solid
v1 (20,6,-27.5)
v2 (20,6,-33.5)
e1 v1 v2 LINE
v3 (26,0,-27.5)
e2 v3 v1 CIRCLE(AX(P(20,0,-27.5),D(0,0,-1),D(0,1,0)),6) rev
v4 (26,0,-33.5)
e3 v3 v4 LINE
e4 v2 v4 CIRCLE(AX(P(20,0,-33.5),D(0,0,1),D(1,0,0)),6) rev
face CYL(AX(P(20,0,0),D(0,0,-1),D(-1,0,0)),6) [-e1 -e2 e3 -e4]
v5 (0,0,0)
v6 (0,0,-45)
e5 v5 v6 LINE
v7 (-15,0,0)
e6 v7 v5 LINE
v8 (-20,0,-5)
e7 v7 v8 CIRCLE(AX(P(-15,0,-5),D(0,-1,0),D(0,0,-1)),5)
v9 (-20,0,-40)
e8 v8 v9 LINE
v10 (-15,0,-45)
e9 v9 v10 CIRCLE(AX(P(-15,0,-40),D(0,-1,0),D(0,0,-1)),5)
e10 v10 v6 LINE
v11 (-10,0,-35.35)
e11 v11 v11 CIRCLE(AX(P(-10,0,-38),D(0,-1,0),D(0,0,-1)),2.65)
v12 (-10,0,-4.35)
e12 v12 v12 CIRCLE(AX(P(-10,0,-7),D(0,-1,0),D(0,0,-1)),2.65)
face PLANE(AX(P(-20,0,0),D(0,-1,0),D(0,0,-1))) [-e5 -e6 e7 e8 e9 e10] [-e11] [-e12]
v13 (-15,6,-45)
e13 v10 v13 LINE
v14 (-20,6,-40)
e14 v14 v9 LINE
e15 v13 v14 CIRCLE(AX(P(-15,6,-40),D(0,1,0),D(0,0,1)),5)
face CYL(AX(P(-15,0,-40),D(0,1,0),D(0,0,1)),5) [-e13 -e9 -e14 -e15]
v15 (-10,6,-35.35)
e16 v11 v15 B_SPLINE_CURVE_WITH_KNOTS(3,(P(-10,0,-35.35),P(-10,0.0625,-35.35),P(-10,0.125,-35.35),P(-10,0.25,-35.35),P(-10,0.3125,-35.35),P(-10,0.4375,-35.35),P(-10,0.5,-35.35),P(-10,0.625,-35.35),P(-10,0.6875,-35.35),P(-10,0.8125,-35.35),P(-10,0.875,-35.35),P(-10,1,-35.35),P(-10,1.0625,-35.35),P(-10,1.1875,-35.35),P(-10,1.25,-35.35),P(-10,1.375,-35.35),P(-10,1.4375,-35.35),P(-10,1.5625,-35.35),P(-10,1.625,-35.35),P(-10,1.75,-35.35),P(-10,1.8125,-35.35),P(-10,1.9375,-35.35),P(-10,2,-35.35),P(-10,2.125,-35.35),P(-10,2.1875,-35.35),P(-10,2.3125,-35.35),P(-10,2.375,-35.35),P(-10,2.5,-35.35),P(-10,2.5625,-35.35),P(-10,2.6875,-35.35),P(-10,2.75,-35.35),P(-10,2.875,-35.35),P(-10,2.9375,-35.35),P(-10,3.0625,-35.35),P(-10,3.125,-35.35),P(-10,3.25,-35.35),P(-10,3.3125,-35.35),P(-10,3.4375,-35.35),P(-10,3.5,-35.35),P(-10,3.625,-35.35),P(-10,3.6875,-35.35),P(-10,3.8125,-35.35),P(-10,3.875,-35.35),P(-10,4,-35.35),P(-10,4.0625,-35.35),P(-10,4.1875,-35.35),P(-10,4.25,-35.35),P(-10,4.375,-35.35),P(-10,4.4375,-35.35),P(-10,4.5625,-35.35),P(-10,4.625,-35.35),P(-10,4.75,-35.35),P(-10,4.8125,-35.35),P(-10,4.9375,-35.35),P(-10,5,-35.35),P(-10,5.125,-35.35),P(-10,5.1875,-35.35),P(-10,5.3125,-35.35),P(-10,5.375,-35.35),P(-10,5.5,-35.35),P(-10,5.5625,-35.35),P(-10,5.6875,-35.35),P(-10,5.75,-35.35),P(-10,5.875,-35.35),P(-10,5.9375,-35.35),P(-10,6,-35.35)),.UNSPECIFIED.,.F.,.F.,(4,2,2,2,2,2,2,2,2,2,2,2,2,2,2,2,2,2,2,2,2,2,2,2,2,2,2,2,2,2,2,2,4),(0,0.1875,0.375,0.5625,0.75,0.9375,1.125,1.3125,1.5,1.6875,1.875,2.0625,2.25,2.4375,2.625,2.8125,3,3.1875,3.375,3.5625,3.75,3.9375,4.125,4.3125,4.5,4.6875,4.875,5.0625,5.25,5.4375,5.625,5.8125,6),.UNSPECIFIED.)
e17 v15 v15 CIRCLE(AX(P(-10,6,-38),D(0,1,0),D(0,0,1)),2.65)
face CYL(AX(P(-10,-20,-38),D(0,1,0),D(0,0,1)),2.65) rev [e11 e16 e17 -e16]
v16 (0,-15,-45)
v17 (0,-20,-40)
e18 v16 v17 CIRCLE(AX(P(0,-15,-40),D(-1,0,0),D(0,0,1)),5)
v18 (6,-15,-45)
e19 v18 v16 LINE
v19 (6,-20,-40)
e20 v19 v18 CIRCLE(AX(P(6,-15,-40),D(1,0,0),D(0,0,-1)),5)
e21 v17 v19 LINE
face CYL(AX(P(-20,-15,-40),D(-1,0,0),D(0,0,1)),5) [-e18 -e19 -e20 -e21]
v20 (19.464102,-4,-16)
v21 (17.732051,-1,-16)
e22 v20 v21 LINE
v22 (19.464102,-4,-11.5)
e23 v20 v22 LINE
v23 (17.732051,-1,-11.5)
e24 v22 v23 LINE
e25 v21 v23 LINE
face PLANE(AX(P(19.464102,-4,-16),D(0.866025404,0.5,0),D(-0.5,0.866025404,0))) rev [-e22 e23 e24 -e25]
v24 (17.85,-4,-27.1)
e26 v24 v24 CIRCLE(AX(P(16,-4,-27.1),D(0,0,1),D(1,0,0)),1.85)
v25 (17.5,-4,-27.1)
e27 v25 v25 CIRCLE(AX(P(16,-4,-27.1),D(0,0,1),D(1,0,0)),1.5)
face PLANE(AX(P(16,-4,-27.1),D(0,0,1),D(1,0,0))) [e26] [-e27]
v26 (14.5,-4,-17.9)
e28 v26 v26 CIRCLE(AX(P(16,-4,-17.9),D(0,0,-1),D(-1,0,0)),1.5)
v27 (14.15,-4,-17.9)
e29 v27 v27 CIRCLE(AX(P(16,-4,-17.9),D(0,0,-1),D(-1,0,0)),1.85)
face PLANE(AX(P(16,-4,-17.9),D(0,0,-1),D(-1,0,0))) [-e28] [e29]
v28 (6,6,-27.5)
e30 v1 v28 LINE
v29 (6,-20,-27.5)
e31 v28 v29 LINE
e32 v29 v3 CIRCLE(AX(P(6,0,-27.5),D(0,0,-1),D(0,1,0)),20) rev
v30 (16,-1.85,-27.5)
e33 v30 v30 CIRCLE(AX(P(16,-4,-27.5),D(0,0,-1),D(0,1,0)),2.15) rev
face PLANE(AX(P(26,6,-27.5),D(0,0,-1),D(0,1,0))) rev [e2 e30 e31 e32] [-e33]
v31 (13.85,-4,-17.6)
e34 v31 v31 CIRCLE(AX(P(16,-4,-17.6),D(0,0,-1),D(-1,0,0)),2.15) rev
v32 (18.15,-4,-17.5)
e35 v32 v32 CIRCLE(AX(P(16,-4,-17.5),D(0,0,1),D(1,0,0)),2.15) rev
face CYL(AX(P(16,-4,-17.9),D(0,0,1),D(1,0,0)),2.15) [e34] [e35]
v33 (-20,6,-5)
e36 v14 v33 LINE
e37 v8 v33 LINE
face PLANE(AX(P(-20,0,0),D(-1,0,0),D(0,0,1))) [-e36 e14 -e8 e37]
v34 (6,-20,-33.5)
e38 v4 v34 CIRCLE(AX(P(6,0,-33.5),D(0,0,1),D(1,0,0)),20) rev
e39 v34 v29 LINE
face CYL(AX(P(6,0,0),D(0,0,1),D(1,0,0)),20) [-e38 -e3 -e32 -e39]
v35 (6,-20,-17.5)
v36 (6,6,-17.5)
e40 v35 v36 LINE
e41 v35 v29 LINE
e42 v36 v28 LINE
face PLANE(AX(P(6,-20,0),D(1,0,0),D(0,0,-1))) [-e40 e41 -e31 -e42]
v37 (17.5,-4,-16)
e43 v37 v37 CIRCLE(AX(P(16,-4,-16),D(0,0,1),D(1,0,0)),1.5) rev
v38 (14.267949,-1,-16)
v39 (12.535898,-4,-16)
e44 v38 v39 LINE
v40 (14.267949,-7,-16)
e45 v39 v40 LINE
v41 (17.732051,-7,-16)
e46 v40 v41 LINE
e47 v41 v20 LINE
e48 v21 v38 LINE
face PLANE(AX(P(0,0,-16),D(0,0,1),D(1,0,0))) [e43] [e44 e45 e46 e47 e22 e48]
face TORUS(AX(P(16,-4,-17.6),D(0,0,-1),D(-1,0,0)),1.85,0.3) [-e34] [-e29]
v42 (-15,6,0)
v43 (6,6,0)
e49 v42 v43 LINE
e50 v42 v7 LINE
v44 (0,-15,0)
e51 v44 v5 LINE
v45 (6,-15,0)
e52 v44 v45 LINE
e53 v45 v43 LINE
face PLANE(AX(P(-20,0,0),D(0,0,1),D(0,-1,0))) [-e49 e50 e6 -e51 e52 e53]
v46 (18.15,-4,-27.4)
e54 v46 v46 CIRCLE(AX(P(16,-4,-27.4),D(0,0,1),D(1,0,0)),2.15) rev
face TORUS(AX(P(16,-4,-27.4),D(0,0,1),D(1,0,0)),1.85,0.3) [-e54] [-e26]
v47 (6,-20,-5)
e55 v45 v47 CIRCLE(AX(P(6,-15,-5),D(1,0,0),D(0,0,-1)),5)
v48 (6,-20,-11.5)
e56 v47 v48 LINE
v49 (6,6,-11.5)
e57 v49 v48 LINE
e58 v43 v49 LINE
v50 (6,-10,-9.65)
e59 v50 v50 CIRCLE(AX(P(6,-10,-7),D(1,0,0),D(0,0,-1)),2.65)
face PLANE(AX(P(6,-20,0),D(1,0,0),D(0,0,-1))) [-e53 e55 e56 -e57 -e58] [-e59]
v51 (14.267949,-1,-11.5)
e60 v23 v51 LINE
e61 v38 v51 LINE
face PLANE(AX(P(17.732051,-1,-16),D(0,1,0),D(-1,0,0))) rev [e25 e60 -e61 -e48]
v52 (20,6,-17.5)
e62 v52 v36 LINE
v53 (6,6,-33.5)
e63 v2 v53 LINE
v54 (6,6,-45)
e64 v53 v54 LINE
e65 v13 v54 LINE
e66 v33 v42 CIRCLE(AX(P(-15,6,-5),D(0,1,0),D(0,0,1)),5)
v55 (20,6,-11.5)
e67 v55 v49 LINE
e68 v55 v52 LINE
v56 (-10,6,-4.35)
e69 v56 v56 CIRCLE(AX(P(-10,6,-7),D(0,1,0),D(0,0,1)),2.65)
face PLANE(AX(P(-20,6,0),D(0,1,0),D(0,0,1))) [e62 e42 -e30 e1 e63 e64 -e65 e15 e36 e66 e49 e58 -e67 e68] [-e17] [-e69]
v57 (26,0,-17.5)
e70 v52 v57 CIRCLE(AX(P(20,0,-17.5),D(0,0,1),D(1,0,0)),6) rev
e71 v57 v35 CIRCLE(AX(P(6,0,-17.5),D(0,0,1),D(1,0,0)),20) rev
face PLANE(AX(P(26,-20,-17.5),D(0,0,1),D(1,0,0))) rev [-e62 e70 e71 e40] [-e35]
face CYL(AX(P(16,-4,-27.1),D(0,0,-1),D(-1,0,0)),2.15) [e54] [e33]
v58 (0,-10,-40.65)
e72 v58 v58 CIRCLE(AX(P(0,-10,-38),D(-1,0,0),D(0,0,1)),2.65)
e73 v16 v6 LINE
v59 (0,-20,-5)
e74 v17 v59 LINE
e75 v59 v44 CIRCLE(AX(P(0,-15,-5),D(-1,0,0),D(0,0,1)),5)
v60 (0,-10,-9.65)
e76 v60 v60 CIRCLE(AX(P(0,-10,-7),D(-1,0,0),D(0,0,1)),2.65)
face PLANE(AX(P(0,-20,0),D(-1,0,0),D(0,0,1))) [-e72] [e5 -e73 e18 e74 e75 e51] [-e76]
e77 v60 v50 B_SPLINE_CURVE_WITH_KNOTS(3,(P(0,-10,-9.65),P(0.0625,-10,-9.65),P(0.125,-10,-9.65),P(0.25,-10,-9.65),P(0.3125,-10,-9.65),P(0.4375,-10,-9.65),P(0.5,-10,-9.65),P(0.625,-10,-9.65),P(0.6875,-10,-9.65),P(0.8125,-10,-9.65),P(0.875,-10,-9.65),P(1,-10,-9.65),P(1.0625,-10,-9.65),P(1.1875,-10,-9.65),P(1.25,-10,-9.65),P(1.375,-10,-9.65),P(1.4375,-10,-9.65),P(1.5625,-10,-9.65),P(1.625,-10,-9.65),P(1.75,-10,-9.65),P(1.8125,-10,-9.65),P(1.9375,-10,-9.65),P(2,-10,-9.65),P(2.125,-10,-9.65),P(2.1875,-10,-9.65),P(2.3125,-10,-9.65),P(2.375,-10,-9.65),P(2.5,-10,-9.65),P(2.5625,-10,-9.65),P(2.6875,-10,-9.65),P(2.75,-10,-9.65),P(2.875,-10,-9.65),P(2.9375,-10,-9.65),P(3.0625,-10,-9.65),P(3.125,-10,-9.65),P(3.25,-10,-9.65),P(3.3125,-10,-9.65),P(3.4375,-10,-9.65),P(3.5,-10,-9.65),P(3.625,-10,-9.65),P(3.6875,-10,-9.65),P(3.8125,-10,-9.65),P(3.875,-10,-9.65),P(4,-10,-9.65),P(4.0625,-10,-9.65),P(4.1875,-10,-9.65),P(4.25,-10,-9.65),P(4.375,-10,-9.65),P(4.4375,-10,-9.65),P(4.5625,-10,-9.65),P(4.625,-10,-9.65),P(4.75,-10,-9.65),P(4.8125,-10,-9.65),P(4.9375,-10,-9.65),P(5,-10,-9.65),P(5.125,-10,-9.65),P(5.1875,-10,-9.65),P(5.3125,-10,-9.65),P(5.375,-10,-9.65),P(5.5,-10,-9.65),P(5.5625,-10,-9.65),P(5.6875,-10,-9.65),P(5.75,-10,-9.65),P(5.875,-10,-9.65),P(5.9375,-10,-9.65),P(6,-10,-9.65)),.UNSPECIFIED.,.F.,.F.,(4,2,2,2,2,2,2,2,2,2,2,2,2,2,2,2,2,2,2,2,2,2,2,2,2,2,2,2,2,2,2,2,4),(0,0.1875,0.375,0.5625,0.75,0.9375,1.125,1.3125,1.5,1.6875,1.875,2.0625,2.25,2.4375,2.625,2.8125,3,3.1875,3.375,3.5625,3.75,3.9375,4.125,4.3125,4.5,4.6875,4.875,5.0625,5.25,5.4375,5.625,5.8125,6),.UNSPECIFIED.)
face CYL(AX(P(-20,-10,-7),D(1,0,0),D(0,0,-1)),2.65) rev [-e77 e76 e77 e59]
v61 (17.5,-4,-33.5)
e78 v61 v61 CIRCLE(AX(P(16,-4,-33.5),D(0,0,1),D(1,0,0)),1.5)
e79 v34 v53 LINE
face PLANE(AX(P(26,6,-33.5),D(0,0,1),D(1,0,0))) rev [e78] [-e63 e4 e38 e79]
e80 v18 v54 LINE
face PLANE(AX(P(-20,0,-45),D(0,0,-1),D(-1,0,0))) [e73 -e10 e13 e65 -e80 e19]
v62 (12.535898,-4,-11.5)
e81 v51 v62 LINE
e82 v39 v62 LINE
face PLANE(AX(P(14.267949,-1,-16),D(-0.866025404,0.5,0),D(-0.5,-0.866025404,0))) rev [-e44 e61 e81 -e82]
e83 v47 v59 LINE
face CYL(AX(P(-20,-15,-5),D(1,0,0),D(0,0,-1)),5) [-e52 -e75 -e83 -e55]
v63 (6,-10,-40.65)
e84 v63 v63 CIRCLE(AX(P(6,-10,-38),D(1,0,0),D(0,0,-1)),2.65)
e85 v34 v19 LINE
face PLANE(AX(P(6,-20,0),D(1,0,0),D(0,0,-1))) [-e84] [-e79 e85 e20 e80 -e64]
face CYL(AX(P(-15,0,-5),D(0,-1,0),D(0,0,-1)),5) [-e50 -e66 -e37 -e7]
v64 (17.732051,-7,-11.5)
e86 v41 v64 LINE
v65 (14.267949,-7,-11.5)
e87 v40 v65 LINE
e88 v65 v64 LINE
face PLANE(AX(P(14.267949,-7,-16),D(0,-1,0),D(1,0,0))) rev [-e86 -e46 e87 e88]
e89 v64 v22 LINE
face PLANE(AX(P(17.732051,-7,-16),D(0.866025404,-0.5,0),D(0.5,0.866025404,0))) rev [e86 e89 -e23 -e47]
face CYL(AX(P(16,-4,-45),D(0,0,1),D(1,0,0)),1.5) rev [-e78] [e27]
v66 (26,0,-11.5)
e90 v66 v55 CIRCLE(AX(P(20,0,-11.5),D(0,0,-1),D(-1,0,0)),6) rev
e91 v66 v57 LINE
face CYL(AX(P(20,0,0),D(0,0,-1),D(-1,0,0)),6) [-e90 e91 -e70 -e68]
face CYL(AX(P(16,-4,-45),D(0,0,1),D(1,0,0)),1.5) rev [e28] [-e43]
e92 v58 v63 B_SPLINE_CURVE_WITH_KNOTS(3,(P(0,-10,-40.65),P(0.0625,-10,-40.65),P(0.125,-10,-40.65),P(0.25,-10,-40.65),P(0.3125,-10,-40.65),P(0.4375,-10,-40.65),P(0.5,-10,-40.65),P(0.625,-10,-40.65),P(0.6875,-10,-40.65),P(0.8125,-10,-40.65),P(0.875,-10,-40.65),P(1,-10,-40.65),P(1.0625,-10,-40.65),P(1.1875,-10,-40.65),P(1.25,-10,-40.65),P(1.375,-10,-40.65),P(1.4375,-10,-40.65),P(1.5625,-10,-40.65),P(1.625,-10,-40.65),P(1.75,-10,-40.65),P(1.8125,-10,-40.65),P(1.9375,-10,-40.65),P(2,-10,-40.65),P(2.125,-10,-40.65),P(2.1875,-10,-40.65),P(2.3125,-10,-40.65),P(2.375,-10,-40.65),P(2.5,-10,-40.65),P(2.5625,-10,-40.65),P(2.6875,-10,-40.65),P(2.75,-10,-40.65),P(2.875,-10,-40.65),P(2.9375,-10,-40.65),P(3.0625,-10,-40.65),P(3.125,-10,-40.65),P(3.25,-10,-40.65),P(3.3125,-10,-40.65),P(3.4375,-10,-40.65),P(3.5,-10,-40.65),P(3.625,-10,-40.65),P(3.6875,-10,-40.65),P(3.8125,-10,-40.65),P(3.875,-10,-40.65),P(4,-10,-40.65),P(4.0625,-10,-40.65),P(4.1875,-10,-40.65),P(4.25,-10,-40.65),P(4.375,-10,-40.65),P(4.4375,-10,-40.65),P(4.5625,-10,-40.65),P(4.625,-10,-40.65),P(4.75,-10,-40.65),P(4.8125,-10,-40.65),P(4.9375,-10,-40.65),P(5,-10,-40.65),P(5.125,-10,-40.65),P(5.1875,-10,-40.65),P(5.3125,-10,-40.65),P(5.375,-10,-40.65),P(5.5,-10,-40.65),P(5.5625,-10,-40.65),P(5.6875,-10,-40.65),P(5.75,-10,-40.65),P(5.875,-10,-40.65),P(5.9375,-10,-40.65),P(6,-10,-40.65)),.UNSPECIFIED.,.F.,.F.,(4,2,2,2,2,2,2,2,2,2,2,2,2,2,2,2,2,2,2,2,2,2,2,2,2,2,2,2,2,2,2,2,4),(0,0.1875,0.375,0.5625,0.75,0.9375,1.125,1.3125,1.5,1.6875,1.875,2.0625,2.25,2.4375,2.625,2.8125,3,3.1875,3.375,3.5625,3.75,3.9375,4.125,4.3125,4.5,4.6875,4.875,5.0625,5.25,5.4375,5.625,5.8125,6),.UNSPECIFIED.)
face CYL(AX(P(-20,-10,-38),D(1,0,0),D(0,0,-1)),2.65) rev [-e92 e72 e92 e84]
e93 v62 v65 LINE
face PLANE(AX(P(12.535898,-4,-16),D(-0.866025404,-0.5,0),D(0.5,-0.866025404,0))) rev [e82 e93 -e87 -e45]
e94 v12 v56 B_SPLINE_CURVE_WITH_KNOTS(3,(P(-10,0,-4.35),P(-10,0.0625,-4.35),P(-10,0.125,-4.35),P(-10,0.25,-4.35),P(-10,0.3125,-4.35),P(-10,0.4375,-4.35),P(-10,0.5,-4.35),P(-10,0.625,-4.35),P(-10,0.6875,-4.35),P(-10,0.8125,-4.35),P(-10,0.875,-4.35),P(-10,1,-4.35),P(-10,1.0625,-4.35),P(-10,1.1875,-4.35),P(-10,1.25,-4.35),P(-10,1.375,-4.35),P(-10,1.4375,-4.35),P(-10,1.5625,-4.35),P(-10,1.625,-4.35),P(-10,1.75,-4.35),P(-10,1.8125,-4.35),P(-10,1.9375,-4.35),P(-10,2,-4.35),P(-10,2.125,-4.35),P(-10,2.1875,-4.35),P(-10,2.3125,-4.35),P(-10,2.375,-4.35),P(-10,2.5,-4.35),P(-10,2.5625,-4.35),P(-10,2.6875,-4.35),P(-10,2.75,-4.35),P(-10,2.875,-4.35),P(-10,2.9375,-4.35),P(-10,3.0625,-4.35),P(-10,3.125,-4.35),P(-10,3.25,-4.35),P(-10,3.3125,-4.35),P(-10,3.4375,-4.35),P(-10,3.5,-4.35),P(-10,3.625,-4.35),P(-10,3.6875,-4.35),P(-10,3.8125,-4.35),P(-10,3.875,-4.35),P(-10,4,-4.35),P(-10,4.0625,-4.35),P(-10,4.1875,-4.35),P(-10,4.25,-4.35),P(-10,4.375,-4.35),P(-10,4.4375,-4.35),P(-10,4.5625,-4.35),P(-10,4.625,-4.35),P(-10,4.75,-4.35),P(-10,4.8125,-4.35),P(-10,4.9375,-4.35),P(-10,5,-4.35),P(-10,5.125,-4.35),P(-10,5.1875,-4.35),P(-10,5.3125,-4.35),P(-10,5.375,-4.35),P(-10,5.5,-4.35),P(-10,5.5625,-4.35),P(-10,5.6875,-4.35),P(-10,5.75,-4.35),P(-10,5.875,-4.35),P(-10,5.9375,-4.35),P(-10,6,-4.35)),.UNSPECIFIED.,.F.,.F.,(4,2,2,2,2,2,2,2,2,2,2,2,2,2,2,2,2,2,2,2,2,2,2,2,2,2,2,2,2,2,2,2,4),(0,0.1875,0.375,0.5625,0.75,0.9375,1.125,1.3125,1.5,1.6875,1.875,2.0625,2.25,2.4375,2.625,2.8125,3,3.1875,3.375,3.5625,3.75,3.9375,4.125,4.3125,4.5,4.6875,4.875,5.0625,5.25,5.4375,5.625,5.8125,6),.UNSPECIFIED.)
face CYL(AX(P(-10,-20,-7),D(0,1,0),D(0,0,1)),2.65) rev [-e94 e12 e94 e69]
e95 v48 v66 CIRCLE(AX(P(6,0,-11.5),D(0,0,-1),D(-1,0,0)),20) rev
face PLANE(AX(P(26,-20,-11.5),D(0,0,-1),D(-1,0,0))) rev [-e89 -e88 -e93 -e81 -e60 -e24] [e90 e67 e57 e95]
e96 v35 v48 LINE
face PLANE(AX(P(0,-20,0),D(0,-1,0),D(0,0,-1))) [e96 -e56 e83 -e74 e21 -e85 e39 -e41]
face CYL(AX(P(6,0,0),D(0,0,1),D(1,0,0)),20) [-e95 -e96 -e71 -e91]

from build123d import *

# Parameters (mm, degrees)
SKETCH1_W           = 45
SKETCH1_H           = 6
BOSS_EXTRUDE1_DEPTH = 20
SKETCH2_W           = 6
SKETCH2_H           = 45
BOSS_EXTRUDE2_DEPTH = 26
SKETCH3_R           = 2.65
CUT_EXTRUDE1_DEPTH  = 26
SKETCH4_R           = 2.65
CUT_EXTRUDE2_DEPTH  = 26
FILLET1_R           = 5
SKETCH5_W           = 6
SKETCH5_H           = 26
BOSS_EXTRUDE3_DEPTH = 20
SKETCH8_R           = 2.15
BOSS_EXTRUDE6_DEPTH = 0.4
BOSS_EXTRUDE5_START = 0.4
SKETCH7_R           = 2.15
BOSS_EXTRUDE5_DEPTH = 0.4
SKETCH6_R           = 1.5
CUT_EXTRUDE3_DEPTH  = 47.885498824
FILLET2_R           = 20
FILLET3_R           = 6
FILLET4_R           = 0.3
FILLET5_R           = 0.3
CUT_EXTRUDE4_DEPTH  = 4.5


with BuildPart() as part:
    # Sketch1 → Boss-Extrude1 (new body)
    with BuildSketch(Plane(origin=(0, 0, 0), x_dir=(0, 0, -1), z_dir=(1, 0, 0))):
        with Locations((22.5, 3)):
            Rectangle(SKETCH1_W, SKETCH1_H)
    extrude(amount=-BOSS_EXTRUDE1_DEPTH)

    # Sketch2 → Boss-Extrude2 (add)
    with BuildSketch(Plane(origin=(0, 6, 0), x_dir=(1, 0, 0), z_dir=(0, 1, 0))):
        with Locations((3, 22.5)):
            Rectangle(SKETCH2_W, SKETCH2_H)
    extrude(amount=-BOSS_EXTRUDE2_DEPTH)

    # Sketch3 → Cut-Extrude1 (cut)
    with BuildSketch(Plane(origin=(0, 6, 0), x_dir=(1, 0, 0), z_dir=(0, 1, 0))):
        with Locations(Location((-10, 7, 0), (0, 0, 270))):
            Circle(SKETCH3_R)
        with Locations(Location((-10, 38, 0), (0, 0, 270))):
            Circle(SKETCH3_R)
    extrude(amount=-CUT_EXTRUDE1_DEPTH, mode=Mode.SUBTRACT)

    # Sketch4 → Cut-Extrude2 (cut)
    with BuildSketch(Plane(origin=(6, 0, 0), x_dir=(0, 0, -1), z_dir=(1, 0, 0))):
        with Locations((7, -10)):
            Circle(SKETCH4_R)
        with Locations((38, -10)):
            Circle(SKETCH4_R)
    extrude(amount=-CUT_EXTRUDE2_DEPTH, mode=Mode.SUBTRACT)

    # Fillet1
    fillet1_edges = [part.edges().sort_by_distance(p)[0] for p in [
        (-20, 3, -45),
        (3, -20, -45),
        (3, -20, 0),
        (-20, 3, 0),
    ]]
    fillet(fillet1_edges, radius=FILLET1_R)

    # Sketch5 → Boss-Extrude3 (add)
    with BuildSketch(Plane(origin=(6, 0, 0), x_dir=(0, 0, -1), z_dir=(1, 0, 0))):
        with Locations((30.5, -7)):
            Rectangle(SKETCH5_W, SKETCH5_H)
        with Locations((14.5, -7)):
            Rectangle(SKETCH5_W, SKETCH5_H)
    extrude(amount=BOSS_EXTRUDE3_DEPTH)

    # Sketch8 → Boss-Extrude6 (add)
    with BuildSketch(Plane.XY.offset(-27.5)):
        with Locations(Location((16, -4, 0), (0, 0, 90))):
            Circle(SKETCH8_R)
    extrude(amount=BOSS_EXTRUDE6_DEPTH)

    # Sketch7 → Boss-Extrude5 (add)
    with BuildSketch(Plane(origin=(0, 0, -17.5), x_dir=(-1, 0, 0), z_dir=(0, 0, -1)).offset(BOSS_EXTRUDE5_START)):
        with Locations(Location((-16, -4, 0), (0, 0, 90))):
            Circle(SKETCH7_R)
    extrude(amount=-BOSS_EXTRUDE5_DEPTH)

    # Sketch6 → Cut-Extrude3 (cut, through all)
    with BuildSketch(Plane.XY.offset(-11.5)):
        with Locations((16, -4)):
            Circle(SKETCH6_R)
    extrude(amount=-CUT_EXTRUDE3_DEPTH, mode=Mode.SUBTRACT)

    # Fillet2
    fillet2_edges = [part.edges().sort_by_distance(p)[0] for p in [
        (26, -20, -14.5),
        (26, -20, -30.5),
    ]]
    fillet(fillet2_edges, radius=FILLET2_R)

    # Fillet3
    fillet3_edges = [part.edges().sort_by_distance(p)[0] for p in [
        (26, 6, -14.5),
        (26, 6, -30.5),
    ]]
    fillet(fillet3_edges, radius=FILLET3_R - 0.0001)  # a hair under: the kernel refuses the full size

    # Fillet4
    fillet4_edges = [part.edges().sort_by_distance(p)[0] for p in [
        (16, -6.15, -27.1),
    ]]
    fillet(fillet4_edges, radius=FILLET4_R)

    # Fillet5
    fillet5_edges = [part.edges().sort_by_distance(p)[0] for p in [
        (16, -6.15, -17.9),
    ]]
    fillet(fillet5_edges, radius=FILLET5_R)

    # Sketch9 → Cut-Extrude4 (cut)
    with BuildSketch(Plane.XY.offset(-11.5)):
        Polygon((14.267949192, -1), (12.535898385, -4), (14.267949192, -7), (17.732050808, -7), (19.464101615, -4), (17.732050808, -1), align=None)
    extrude(amount=-CUT_EXTRUDE4_DEPTH, mode=Mode.SUBTRACT)


solid = part.part
